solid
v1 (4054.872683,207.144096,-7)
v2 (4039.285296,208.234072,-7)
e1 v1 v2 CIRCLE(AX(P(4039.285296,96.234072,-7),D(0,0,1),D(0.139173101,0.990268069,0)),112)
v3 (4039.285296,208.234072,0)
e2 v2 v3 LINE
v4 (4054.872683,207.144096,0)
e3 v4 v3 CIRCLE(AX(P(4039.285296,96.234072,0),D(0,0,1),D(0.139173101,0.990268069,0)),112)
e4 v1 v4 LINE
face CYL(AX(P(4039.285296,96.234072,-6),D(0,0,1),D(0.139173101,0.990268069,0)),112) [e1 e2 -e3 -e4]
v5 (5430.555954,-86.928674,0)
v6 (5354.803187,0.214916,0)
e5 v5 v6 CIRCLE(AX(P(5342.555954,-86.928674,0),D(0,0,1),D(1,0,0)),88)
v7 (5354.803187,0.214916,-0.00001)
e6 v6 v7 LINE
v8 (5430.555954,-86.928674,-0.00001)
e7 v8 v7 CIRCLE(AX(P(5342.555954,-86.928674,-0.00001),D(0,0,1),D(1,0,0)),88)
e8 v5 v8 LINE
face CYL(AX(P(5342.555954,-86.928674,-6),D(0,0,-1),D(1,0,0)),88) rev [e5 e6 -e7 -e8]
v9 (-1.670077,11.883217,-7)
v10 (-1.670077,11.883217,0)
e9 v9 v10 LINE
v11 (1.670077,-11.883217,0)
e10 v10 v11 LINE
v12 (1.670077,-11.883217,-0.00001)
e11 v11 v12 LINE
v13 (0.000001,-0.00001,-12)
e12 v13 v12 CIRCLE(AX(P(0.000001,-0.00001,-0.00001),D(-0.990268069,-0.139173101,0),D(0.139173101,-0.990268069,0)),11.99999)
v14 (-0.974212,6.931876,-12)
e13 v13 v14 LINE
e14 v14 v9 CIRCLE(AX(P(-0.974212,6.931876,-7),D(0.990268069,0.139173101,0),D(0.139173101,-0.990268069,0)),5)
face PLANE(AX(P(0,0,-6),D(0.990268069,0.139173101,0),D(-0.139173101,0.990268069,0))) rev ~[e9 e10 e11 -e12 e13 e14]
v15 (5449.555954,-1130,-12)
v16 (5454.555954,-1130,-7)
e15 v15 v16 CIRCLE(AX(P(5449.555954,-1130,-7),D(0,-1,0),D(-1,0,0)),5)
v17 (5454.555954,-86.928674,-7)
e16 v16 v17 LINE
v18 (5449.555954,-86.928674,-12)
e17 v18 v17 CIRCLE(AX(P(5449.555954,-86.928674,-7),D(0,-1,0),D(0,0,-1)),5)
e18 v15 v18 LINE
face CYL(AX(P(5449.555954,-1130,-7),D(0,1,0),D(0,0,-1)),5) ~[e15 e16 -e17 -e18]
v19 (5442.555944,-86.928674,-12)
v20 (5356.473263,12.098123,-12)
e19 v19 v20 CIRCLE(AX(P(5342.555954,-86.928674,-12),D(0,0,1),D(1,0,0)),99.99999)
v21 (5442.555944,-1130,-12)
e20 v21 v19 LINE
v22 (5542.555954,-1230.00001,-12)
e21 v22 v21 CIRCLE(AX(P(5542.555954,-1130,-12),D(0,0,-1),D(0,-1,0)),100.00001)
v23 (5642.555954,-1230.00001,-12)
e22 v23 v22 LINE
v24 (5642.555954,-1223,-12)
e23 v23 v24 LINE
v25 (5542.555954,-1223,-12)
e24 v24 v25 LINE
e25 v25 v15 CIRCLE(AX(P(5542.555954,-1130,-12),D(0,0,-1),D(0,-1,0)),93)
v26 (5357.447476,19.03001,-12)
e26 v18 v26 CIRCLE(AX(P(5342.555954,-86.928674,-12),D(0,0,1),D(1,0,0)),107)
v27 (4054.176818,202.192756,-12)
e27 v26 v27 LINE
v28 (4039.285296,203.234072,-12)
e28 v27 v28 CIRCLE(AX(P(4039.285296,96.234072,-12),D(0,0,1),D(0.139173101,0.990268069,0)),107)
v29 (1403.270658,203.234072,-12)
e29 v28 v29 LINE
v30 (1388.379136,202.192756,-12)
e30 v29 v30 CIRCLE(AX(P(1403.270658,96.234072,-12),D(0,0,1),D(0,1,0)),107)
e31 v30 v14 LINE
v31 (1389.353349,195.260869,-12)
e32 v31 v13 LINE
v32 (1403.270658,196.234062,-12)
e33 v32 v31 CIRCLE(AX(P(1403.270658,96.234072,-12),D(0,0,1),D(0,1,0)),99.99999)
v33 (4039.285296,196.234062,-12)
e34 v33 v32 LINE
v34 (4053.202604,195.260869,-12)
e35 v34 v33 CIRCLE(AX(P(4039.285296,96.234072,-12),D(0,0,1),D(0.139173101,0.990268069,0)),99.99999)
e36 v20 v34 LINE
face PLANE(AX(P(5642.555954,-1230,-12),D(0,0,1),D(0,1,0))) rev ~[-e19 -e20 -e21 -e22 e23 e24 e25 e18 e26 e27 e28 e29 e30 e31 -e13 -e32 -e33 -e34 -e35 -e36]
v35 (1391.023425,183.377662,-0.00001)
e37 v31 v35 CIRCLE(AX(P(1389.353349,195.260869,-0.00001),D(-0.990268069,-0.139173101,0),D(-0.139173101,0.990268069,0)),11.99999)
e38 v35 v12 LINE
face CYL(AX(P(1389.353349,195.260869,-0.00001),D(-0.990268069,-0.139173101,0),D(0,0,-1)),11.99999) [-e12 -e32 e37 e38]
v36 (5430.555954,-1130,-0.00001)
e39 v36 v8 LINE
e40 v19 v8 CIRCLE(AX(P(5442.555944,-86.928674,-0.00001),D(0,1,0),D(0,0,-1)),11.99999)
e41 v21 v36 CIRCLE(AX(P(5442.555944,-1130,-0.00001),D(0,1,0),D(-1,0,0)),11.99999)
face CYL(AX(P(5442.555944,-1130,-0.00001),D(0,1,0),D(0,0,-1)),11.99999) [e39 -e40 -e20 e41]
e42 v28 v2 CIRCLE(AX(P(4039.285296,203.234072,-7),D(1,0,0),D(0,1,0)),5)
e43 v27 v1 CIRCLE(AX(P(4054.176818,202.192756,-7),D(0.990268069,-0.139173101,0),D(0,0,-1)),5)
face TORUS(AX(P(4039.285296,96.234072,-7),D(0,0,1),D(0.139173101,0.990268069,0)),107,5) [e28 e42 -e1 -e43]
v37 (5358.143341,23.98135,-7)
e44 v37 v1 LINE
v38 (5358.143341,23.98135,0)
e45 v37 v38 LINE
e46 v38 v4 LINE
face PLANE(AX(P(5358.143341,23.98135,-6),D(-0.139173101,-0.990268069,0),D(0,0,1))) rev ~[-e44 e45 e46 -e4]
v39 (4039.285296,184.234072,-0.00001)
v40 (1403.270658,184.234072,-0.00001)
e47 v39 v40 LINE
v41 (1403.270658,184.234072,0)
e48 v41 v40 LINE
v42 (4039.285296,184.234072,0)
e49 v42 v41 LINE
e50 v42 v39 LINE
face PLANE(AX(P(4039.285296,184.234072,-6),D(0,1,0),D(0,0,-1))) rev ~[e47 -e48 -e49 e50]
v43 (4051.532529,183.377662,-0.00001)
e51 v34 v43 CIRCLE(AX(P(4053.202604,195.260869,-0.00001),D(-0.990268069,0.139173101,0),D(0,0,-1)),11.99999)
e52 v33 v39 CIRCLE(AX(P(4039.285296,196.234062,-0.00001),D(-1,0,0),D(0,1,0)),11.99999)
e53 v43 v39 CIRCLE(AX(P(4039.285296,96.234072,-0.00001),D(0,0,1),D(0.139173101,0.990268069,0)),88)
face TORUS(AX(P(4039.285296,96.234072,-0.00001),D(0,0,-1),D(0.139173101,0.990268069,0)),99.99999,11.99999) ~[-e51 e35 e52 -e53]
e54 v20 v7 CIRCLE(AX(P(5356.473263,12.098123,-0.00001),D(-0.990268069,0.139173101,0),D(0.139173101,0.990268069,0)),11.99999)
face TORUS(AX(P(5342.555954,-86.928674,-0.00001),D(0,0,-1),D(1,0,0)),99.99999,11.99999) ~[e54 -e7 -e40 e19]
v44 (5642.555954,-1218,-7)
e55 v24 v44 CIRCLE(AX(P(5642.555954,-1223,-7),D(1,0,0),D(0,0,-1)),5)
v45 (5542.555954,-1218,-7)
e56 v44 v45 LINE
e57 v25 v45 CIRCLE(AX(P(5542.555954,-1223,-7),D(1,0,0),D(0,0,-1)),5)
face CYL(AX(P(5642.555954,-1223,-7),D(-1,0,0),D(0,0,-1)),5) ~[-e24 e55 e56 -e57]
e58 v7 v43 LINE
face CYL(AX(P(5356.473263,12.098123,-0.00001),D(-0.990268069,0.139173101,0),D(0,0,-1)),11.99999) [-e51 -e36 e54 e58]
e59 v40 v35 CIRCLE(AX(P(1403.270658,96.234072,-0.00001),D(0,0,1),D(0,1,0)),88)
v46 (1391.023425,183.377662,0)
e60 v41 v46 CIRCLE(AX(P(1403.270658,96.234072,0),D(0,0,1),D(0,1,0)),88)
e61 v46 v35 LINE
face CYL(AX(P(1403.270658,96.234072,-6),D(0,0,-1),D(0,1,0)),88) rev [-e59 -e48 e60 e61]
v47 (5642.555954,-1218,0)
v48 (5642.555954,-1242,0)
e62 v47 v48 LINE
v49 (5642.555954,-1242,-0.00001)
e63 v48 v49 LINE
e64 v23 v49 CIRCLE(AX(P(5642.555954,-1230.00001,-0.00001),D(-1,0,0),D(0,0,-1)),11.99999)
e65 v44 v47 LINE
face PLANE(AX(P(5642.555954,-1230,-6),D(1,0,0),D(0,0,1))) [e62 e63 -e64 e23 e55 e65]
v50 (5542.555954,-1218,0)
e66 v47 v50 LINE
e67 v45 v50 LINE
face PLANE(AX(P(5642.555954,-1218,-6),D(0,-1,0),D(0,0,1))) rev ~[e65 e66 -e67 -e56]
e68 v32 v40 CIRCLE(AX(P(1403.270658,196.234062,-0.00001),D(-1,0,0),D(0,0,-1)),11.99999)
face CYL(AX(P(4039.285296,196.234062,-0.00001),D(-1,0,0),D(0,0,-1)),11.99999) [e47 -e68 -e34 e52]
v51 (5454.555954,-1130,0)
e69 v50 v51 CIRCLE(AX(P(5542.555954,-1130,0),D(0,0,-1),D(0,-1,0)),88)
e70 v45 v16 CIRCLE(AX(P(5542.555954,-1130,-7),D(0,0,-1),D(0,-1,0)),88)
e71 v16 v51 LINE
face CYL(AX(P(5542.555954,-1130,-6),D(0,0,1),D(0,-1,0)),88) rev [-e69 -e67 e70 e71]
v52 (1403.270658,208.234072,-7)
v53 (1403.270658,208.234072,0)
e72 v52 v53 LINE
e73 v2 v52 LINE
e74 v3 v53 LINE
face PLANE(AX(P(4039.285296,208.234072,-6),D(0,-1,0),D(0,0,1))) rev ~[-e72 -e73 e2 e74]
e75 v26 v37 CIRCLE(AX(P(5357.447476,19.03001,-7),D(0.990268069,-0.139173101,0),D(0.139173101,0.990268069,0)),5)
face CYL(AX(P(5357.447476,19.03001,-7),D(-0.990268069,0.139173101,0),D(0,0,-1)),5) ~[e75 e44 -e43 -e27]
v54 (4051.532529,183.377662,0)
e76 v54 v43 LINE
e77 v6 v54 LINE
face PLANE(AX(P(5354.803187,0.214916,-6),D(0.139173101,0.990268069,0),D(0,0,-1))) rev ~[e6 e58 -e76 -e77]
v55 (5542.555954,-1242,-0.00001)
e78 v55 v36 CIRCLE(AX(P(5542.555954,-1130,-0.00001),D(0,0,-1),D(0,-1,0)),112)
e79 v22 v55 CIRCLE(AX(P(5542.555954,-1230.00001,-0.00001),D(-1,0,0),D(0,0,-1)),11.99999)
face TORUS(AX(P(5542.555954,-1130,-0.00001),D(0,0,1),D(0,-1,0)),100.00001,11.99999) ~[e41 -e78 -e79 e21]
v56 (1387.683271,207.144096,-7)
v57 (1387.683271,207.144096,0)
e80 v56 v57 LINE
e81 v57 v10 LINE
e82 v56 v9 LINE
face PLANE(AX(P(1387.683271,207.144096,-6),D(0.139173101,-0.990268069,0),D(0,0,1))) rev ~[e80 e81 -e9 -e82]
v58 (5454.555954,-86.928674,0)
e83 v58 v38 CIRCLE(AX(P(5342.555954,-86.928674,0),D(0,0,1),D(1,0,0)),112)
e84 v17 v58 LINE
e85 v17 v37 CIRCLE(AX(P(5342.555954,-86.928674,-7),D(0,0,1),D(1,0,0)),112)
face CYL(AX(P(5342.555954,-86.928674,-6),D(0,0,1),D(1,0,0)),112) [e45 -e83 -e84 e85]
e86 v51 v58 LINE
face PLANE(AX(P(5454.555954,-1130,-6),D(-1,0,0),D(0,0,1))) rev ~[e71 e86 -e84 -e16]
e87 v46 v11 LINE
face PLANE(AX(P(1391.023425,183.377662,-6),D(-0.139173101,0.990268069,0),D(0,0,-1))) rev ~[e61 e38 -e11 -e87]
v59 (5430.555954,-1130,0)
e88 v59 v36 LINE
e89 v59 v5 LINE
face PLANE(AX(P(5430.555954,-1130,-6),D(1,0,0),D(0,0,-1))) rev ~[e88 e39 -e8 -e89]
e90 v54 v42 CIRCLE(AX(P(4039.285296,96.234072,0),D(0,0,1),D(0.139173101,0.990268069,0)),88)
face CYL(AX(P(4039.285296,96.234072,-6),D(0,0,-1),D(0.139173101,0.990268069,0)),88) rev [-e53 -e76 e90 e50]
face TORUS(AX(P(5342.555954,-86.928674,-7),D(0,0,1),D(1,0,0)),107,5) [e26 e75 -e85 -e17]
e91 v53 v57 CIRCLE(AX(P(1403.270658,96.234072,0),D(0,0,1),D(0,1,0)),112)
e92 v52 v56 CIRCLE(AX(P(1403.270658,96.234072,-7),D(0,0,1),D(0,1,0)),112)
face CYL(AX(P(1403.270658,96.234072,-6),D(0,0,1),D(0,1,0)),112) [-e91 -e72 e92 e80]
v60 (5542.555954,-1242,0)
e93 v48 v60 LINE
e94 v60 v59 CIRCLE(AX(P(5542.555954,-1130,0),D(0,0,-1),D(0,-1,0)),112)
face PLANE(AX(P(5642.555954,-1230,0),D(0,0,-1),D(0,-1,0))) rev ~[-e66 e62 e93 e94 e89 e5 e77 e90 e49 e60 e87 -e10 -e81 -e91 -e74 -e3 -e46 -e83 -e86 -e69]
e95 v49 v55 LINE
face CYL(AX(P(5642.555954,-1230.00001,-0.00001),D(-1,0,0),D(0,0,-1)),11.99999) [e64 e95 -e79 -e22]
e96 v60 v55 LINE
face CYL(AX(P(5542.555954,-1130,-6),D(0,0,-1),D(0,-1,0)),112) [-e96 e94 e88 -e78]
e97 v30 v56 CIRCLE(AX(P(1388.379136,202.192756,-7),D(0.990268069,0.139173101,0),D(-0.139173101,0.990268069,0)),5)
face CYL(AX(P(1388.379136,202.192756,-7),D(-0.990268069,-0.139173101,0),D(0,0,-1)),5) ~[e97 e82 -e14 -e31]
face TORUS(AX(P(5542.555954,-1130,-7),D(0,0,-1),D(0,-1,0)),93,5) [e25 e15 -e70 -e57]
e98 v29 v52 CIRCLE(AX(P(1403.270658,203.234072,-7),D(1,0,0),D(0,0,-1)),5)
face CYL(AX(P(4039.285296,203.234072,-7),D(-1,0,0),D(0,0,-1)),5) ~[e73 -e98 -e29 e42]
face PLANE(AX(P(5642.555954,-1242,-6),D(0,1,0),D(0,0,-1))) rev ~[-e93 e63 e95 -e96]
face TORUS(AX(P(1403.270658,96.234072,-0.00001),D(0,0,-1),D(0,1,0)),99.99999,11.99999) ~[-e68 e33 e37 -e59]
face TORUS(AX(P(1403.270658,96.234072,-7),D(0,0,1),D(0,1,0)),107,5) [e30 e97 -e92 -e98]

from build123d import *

# Parameters (mm, degrees)
F2_W = 24
F2_H = 12
F4_R = 5
F5_R = 11.99999


# Not quite as in the source:
# - a fillet or chamfer is up to 0.001 mm smaller than in the source, because OpenCascade refuses the exact size


with BuildPart() as f3:
    # F3: sweep along a path in F0
    with BuildLine(Plane.XY) as f3_path:
        Line((5642.5559538512, -1230), (5542.5559538512, -1230))
        ThreePointArc((5542.5559538512, -1230), (5471.8452757326, -1200.7106781187), (5442.5559538512, -1130))
        Line((5442.5559538512, -1130), (5442.5559538512, -86.9286737816))
        ThreePointArc((5442.5559538512, -86.9286737816), (5418.0269118735, -21.3227708826), (5356.4732639472, 12.0981330925))
        Line((5356.4732639472, 12.0981330925), (4053.2026058273, 195.2608792278))
        ThreePointArc((4053.2026058273, 195.2608792278), (4046.2609431057, 195.9904773797), (4039.2852957313, 196.2340723537))
        Line((4039.2852957313, 196.2340723537), (1403.27065812, 196.2340723537))
        ThreePointArc((1403.27065812, 196.2340723537), (1396.2950107456, 195.9904773797), (1389.353348024, 195.2608792278))
        Line((1389.353348024, 195.2608792278), (0, 0))
    # F2 (on line) → F3 (sweep)
    with BuildSketch(Plane.YZ.offset(5642.5559538512)):
        with Locations((-1230, -6)):
            Rectangle(F2_W, F2_H)
    sweep(path=f3_path.line)

    # F4
    f4_edges = [f3.edges().sort_by_distance(p)[0] for p in [
        (5592.555954, -1218, -12),
    ]]
    fillet(f4_edges, radius=F4_R)

    # F5 (radius 12 in the source; OpenCascade refuses exactly that, so slightly less here)
    f5_edges = [f3.edges().sort_by_distance(p)[0] for p in [
        (5592.555954, -1242, -12),
    ]]
    fillet(f5_edges, radius=F5_R)


solid = f3.part
